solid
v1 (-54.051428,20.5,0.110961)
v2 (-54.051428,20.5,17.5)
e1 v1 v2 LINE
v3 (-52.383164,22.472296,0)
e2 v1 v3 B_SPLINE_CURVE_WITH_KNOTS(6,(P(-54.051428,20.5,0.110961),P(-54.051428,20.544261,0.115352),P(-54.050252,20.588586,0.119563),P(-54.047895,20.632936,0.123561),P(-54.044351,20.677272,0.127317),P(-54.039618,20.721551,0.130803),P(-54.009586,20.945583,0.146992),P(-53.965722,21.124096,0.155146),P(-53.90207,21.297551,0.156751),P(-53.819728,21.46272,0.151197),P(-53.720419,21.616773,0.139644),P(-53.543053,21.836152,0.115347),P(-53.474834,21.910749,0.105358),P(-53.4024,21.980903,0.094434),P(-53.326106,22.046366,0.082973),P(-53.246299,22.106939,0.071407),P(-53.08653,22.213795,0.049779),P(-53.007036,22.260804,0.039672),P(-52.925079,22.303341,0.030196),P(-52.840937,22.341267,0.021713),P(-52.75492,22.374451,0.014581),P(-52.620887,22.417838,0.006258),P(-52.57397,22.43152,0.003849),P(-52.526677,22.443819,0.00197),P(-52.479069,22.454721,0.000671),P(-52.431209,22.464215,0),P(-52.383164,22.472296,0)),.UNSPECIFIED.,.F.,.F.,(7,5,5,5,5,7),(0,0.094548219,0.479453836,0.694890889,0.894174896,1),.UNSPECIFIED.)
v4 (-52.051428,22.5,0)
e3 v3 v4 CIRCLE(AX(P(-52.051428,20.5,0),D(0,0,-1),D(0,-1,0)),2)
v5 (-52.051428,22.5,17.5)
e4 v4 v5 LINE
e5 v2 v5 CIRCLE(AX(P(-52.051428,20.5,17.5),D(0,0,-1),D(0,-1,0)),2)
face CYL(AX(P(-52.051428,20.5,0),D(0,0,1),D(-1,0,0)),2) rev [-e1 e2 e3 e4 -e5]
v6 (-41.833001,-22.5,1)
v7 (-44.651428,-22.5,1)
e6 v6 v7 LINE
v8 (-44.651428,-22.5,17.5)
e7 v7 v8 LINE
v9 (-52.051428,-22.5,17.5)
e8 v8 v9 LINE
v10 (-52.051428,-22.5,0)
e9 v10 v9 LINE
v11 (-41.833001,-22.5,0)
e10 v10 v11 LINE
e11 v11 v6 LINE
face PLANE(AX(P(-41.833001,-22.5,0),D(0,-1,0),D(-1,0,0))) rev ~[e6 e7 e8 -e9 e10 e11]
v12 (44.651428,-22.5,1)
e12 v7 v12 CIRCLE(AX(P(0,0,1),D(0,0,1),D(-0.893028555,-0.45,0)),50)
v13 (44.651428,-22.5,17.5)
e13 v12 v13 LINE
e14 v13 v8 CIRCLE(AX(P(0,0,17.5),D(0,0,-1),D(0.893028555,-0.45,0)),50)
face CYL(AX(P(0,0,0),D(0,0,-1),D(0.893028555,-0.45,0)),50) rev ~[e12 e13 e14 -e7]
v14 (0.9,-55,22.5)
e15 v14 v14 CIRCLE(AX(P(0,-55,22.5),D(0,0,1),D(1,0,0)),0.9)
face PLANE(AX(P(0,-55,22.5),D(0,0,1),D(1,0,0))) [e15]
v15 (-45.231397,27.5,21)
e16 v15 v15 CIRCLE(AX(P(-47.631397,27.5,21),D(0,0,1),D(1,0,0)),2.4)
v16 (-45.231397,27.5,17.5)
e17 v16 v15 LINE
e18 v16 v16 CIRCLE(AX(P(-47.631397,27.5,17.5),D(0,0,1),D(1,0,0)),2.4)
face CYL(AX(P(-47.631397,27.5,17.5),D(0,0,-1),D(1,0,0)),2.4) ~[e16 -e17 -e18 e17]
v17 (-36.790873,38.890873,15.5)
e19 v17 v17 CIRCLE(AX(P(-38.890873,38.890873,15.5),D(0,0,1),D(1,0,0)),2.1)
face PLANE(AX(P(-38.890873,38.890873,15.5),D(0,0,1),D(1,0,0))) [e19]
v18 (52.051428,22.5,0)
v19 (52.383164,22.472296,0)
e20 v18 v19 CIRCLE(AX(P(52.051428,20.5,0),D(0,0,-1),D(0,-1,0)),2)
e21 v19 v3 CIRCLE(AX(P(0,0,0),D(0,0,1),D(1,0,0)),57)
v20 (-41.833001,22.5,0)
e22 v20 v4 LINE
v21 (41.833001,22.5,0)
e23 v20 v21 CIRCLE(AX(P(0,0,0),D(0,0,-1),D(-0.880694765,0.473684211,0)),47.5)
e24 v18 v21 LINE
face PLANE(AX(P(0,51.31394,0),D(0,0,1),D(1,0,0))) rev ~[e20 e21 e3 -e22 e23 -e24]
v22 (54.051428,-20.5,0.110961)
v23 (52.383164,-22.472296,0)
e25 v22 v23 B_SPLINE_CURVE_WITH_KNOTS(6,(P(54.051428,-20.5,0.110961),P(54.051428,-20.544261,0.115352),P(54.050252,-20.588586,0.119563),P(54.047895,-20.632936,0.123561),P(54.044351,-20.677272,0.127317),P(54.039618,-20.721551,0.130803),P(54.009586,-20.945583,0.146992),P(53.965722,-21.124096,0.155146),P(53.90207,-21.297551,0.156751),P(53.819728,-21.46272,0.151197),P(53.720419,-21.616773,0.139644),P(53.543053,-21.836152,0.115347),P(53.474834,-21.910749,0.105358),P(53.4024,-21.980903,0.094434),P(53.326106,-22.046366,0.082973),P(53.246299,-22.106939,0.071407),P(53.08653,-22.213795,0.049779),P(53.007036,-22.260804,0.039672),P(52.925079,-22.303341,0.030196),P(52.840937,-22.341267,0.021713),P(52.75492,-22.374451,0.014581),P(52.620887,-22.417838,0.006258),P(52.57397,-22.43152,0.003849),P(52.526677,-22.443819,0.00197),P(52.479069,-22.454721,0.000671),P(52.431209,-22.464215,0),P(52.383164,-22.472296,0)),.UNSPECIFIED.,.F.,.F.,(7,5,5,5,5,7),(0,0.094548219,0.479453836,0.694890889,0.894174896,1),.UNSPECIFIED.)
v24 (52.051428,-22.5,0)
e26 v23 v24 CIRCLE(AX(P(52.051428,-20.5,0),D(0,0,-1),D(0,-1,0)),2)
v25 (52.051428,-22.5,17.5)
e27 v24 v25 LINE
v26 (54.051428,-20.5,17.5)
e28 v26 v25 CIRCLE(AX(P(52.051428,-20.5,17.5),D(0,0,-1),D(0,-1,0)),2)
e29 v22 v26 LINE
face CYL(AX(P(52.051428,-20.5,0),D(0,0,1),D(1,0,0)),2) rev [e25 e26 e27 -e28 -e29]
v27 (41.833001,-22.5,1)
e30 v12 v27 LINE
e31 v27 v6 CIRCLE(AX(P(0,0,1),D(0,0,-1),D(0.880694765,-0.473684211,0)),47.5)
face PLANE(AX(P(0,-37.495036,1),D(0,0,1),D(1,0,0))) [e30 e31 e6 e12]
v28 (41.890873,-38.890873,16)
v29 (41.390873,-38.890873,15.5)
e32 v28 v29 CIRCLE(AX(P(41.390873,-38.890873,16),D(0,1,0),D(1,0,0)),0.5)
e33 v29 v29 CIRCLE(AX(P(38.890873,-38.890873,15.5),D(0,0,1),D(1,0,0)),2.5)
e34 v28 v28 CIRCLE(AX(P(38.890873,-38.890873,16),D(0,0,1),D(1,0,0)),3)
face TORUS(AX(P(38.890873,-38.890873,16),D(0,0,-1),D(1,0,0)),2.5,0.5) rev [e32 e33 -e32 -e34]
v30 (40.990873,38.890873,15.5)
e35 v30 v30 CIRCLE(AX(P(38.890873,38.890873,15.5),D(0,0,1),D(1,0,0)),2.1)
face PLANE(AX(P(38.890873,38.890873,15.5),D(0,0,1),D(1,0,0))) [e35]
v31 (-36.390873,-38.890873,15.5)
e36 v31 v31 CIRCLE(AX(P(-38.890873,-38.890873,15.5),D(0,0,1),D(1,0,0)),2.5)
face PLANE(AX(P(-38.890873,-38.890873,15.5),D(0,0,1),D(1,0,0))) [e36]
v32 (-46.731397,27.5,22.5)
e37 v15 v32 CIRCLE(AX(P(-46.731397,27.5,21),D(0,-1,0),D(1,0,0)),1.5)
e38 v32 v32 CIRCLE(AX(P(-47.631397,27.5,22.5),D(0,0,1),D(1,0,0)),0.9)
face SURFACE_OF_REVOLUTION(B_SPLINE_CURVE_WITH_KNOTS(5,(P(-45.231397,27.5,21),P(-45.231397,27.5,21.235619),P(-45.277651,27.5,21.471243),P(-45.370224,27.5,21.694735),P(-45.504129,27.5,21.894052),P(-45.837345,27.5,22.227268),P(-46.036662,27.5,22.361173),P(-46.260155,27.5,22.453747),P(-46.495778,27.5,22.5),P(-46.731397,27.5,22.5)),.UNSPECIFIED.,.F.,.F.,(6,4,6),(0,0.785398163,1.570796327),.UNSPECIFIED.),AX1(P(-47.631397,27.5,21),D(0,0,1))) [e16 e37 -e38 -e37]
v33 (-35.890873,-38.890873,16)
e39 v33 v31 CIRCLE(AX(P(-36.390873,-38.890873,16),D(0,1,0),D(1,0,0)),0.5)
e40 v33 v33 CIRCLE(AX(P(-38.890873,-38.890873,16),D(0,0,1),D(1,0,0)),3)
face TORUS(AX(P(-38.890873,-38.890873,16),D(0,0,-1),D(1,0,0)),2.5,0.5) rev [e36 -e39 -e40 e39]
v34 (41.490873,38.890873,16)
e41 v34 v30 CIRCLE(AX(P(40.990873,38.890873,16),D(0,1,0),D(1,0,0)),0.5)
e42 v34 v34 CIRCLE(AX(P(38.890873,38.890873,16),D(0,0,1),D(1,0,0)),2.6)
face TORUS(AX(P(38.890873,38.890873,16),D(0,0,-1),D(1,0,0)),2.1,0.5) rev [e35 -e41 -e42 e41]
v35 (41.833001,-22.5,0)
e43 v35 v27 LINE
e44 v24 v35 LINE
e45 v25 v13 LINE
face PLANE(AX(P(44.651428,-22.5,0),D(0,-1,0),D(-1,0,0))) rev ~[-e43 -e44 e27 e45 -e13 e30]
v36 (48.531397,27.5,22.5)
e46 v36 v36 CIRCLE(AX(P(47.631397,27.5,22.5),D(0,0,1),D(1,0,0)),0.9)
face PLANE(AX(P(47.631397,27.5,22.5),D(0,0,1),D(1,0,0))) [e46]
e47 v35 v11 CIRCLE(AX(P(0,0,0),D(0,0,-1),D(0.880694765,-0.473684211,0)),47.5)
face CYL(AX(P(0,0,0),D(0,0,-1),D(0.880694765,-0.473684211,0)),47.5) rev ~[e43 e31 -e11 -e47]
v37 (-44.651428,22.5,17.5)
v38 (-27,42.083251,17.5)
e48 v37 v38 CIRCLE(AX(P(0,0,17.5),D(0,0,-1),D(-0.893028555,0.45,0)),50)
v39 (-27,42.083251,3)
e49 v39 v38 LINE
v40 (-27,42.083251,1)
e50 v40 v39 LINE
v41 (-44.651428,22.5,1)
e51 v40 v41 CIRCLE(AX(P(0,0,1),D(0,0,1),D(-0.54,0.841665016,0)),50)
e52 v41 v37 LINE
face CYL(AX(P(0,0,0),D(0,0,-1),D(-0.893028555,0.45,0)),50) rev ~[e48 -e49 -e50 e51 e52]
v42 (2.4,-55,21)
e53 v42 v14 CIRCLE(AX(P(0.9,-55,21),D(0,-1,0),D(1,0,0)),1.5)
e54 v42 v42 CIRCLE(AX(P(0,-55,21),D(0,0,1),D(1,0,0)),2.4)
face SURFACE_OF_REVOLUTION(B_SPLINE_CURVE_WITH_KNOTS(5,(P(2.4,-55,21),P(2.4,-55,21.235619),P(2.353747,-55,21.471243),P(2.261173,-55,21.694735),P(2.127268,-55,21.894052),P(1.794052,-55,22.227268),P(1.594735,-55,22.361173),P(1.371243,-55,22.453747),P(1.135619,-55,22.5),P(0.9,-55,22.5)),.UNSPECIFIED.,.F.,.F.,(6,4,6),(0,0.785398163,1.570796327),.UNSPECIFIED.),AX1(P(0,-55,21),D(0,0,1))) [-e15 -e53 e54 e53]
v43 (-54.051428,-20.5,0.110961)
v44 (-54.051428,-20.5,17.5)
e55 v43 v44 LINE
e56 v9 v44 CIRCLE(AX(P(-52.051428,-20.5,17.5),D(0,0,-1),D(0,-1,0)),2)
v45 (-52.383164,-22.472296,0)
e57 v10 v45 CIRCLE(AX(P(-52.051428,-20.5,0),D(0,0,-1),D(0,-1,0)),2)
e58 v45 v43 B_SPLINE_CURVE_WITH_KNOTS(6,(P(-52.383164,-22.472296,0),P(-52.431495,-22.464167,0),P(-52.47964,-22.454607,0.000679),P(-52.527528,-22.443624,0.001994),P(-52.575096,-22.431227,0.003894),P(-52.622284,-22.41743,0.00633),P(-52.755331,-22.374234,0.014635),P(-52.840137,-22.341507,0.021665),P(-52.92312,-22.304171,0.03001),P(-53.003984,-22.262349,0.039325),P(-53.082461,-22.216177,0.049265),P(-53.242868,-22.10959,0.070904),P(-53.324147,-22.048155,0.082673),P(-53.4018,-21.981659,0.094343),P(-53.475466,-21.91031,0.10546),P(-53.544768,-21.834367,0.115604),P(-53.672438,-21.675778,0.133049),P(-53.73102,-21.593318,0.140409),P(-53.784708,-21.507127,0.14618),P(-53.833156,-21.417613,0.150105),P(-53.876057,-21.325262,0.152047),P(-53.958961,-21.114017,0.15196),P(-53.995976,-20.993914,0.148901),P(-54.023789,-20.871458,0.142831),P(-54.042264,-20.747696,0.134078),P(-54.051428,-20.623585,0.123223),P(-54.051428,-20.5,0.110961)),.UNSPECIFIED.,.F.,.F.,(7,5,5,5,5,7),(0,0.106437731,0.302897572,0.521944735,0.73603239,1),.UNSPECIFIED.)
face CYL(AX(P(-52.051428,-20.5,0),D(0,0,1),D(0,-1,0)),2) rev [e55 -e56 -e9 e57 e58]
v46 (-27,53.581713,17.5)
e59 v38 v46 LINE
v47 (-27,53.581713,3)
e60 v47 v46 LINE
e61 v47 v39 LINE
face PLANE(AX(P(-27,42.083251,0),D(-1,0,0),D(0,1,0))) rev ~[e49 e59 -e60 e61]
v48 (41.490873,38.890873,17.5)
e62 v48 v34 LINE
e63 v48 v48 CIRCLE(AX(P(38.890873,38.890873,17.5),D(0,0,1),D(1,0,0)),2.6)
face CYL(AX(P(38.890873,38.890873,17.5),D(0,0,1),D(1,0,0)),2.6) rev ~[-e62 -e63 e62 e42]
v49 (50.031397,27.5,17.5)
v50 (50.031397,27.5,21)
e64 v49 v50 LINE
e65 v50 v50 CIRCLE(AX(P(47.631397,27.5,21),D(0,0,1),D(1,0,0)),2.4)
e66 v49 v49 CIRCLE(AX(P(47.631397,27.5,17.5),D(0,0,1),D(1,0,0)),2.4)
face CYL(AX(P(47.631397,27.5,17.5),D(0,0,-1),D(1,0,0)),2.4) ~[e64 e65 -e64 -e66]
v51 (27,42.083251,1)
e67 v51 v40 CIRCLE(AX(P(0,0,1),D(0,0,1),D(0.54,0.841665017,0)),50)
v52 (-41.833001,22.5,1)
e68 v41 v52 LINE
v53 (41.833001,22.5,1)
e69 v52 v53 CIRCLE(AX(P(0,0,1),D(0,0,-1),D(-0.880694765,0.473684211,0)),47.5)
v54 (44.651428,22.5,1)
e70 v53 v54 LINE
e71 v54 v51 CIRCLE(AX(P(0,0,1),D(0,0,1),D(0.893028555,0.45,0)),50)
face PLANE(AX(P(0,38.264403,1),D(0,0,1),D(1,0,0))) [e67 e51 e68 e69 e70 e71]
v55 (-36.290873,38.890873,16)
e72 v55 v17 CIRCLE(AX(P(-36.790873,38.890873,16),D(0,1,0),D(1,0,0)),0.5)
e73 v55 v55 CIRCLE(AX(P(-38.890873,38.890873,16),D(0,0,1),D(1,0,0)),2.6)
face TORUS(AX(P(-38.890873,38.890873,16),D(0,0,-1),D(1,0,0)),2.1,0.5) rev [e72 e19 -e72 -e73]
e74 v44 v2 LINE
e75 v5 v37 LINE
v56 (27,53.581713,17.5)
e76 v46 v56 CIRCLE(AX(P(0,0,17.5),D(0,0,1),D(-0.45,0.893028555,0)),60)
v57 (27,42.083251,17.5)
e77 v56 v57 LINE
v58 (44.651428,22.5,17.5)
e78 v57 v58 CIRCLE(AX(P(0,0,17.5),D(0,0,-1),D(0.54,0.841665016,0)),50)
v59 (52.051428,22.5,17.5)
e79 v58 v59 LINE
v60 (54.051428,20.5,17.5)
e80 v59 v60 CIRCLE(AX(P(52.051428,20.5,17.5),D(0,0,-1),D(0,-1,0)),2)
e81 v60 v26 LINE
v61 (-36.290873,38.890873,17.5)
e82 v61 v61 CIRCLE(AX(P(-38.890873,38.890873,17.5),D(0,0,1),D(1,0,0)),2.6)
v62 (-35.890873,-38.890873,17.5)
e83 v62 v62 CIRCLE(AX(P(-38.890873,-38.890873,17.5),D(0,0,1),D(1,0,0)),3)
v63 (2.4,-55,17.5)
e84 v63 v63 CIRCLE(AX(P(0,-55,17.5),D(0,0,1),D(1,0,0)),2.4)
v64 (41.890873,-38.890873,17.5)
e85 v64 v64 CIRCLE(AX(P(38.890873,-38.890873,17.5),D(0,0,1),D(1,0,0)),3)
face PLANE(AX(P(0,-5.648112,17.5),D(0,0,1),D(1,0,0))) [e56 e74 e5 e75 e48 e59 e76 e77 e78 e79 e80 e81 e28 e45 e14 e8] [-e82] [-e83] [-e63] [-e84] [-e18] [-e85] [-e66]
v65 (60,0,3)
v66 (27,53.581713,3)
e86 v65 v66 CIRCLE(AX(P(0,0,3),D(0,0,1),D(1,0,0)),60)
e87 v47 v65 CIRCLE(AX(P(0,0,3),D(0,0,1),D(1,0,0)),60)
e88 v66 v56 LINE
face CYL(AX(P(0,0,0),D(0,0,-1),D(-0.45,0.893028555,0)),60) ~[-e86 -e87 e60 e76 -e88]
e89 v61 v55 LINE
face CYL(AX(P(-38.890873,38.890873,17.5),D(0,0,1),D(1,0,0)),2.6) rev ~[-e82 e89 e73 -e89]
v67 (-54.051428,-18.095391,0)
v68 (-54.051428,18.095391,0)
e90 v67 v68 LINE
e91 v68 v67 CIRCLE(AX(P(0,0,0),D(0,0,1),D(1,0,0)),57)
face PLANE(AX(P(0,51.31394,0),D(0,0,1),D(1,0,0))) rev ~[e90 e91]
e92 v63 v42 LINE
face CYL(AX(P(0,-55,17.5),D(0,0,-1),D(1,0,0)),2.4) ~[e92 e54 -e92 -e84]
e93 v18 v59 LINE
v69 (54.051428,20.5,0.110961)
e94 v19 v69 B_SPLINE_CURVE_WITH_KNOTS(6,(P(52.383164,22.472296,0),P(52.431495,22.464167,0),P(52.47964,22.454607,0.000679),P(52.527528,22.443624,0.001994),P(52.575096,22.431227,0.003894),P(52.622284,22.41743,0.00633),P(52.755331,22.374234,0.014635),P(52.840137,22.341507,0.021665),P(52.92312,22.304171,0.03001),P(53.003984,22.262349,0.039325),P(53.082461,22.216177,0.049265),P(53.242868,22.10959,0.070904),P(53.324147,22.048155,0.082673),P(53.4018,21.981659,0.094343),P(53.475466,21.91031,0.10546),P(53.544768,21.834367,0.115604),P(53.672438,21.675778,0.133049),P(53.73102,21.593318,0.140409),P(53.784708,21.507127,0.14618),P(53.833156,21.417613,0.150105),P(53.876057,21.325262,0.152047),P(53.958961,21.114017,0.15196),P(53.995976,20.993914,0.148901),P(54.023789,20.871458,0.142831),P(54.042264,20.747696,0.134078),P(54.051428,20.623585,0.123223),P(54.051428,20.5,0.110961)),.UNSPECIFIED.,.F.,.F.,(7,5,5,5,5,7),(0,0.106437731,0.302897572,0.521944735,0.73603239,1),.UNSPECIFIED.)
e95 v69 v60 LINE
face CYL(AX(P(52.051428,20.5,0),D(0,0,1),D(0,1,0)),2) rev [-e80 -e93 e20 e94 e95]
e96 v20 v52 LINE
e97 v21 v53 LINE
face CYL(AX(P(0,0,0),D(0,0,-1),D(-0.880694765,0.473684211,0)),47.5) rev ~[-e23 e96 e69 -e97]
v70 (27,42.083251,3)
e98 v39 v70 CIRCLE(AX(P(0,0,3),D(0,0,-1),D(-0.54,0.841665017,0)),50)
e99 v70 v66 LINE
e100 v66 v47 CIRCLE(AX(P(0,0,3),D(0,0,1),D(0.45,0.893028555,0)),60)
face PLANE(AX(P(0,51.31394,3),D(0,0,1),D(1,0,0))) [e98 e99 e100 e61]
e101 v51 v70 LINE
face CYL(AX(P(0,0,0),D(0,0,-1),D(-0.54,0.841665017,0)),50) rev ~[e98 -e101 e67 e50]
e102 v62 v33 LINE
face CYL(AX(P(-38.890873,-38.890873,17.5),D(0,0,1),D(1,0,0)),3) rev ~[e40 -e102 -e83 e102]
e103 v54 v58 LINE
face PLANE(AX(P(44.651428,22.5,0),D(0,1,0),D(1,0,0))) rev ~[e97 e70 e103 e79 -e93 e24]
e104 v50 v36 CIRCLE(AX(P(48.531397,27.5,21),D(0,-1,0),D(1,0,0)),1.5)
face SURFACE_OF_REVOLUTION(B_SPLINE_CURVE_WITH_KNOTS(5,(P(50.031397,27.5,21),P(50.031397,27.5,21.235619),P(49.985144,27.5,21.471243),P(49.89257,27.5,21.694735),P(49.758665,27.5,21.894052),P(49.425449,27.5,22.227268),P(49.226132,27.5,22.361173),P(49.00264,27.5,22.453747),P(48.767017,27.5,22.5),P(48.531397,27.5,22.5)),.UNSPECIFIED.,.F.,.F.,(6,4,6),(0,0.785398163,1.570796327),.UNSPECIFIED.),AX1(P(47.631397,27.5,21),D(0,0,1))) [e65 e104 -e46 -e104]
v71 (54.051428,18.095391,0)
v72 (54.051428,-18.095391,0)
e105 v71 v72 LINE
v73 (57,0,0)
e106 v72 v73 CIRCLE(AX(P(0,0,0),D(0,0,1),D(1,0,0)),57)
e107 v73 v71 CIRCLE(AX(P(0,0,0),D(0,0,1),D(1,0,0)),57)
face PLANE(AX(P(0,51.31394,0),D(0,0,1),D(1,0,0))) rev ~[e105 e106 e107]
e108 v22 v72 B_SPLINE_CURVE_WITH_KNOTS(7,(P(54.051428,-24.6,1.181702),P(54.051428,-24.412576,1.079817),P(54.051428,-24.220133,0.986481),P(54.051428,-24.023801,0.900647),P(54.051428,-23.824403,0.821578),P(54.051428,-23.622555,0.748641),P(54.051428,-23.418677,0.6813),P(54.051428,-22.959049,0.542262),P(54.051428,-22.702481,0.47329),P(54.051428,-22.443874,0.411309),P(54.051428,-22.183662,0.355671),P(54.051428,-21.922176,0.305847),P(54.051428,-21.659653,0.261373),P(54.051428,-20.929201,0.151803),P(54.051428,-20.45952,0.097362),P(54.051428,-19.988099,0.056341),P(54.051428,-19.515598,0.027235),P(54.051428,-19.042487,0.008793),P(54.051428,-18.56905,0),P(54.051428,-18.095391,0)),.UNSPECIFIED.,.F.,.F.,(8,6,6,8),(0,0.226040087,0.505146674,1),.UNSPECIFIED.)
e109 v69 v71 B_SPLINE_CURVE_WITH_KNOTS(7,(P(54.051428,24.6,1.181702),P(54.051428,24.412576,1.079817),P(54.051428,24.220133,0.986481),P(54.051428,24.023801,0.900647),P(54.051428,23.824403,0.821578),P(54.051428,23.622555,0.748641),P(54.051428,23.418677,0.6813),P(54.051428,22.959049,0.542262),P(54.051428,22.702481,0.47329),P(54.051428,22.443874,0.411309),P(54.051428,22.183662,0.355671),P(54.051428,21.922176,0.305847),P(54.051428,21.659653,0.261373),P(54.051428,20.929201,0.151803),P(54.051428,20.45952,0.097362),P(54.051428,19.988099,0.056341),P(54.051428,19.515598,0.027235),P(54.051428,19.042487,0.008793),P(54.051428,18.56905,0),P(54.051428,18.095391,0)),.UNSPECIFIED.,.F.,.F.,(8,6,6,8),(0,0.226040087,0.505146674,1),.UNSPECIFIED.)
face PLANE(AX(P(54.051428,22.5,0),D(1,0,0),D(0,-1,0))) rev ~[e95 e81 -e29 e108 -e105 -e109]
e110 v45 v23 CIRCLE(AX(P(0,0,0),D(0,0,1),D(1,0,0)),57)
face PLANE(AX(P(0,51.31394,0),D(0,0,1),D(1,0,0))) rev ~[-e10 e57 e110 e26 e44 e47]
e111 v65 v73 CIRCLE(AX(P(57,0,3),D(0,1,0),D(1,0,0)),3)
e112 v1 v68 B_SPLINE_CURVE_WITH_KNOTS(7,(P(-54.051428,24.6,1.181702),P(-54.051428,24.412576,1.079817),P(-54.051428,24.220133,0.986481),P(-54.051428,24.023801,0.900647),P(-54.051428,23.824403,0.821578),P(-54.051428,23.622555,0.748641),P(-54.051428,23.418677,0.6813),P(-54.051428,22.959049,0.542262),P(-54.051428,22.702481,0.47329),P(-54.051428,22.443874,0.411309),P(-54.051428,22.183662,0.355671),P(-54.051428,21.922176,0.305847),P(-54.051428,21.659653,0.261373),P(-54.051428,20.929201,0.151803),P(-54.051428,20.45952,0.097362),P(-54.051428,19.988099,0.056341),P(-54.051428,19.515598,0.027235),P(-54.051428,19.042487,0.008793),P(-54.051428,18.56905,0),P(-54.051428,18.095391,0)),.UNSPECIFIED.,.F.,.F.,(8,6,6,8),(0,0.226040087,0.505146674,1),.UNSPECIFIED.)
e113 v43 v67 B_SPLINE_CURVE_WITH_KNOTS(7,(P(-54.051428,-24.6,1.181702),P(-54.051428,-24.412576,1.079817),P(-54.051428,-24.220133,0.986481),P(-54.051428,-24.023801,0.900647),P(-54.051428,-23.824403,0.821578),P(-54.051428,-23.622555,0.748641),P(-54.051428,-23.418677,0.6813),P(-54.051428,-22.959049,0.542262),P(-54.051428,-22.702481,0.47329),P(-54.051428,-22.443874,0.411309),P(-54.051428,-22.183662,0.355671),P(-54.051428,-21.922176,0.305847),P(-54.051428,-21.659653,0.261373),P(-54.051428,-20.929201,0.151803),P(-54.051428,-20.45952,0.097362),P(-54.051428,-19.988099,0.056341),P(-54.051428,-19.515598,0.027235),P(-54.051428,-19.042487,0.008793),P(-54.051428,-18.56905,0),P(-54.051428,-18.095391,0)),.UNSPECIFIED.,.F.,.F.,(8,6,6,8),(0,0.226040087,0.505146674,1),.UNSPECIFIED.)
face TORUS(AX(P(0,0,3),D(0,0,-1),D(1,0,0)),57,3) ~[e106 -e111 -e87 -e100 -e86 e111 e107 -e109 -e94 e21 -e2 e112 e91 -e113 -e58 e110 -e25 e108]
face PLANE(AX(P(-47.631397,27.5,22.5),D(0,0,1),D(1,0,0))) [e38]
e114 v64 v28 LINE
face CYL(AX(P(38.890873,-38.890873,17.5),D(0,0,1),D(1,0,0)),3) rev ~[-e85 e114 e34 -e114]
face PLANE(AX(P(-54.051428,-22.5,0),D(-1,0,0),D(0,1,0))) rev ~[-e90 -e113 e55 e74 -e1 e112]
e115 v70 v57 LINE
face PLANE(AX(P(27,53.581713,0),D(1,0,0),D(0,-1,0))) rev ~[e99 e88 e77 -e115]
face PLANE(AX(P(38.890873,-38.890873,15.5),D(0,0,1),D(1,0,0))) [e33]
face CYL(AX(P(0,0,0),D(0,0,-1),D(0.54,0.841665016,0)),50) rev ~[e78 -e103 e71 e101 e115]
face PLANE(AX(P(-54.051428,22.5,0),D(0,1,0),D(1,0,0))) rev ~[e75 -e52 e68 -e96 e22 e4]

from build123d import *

# Parameters (mm, degrees)
F1_DEPTH  = 17.5
F2_R      = 2.6
F2_R_2    = 3
F3_DEPTH  = 2
F2_R_3    = 2.4
F4_DEPTH  = 5
F5_R      = 0.5
F6_R      = 1.5
F10_DEPTH = 1
F11_DEPTH = 3
F12_R     = 2


# Not quite as in the source:
# - a fillet or chamfer that OpenCascade refuses, or shapes differently, is made with other operations: its cross-section is extruded or revolved along the edge and cut away or added


with BuildPart() as f1:
    # F0 (on Top) → F1 (new body)
    with BuildSketch(Plane.XY):
        with BuildLine():
            ThreePointArc((-27, 53.5817132985), (-31.4642654451, -51.0881590978), (60, 0))
            ThreePointArc((60, 0), (51.0881590978, 31.4642654451), (27, 53.5817132985))
            Line((27, 53.5817132985), (27, 42.083250825))
            ThreePointArc((27, 42.083250825), (37.1397052065, 33.4759958354), (44.6514277487, 22.5))
            Line((44.6514277487, 22.5), (54.0514277487, 22.5))
            Line((54.0514277487, 22.5), (54.0514277487, -22.5))
            Line((54.0514277487, -22.5), (44.6514277487, -22.5))
            ThreePointArc((44.6514277487, -22.5), (0, -50), (-44.6514277487, -22.5))
            Line((-44.6514277487, -22.5), (-54.0514277487, -22.5))
            Line((-54.0514277487, -22.5), (-54.0514277487, 22.5))
            Line((-54.0514277487, 22.5), (-44.6514277487, 22.5))
            ThreePointArc((-44.6514277487, 22.5), (-37.1397052065, 33.4759958354), (-27, 42.083250825))
            Line((-27, 42.083250825), (-27, 53.5817132985))
        make_face()
    extrude(amount=F1_DEPTH)

    # F2 (on face) → F3 (cut)
    with BuildSketch(Plane.XY.offset(17.5)):
        with Locations((-38.8908729653, 38.8908729653)):
            Circle(F2_R)
        with Locations((38.8908729653, 38.8908729653)):
            Circle(F2_R)
        with Locations((38.8908729653, -38.8908729653)):
            Circle(F2_R_2)
        with Locations((-38.8908729653, -38.8908729653)):
            Circle(F2_R_2)
    extrude(amount=-F3_DEPTH, mode=Mode.SUBTRACT)

    # F2 (on face) → F4 (join)
    with BuildSketch(Plane.XY.offset(17.5)):
        with Locations((0, -55)):
            Circle(F2_R_3)
        with Locations((47.6313972081, 27.5)):
            Circle(F2_R_3)
        with Locations((-47.6313972081, 27.5)):
            Circle(F2_R_3)
    extrude(amount=F4_DEPTH)

    # F5
    f5_edges = [f1.edges().sort_by_distance(p)[0] for p in [
        (35.890873, -38.890873, 15.5),
        (-41.890873, -38.890873, 15.5),
        (-41.490873, 38.890873, 15.5),
        (36.290873, 38.890873, 15.5),
    ]]
    fillet(f5_edges, radius=F5_R)

    # F6
    f6_edges = [f1.edges().sort_by_distance(p)[0] for p in [
        (-2.4, -55, 22.5),
        (-50.031397, 27.5, 22.5),
        (45.231397, 27.5, 22.5),
    ]]
    fillet(f6_edges, radius=F6_R)


with BuildPart() as f7_1:
    # F7: copy of F1
    add(f1.part)


with BuildPart() as f1_1:
    add(f1.part)

    # F0 (on Top) → F10 (join)
    with BuildSketch(Plane.XY):
        with BuildLine():
            ThreePointArc((-44.6514277487, -22.5), (0, -50), (44.6514277487, -22.5))
            Line((44.6514277487, -22.5), (41.8330013267, -22.5))
            ThreePointArc((41.8330013267, -22.5), (0, -47.5), (-41.8330013267, -22.5))
            Line((-41.8330013267, -22.5), (-44.6514277487, -22.5))
        make_face()
        with BuildLine():
            ThreePointArc((44.6514277487, 22.5), (37.1397052065, 33.4759958354), (27, 42.083250825))
            ThreePointArc((27, 42.083250825), (0, 50), (-27, 42.083250825))
            ThreePointArc((-27, 42.083250825), (-37.1397052065, 33.4759958354), (-44.6514277487, 22.5))
            Line((-44.6514277487, 22.5), (-41.8330013267, 22.5))
            ThreePointArc((-41.8330013267, 22.5), (0, 47.5), (41.8330013267, 22.5))
            Line((41.8330013267, 22.5), (44.6514277487, 22.5))
        make_face()
    extrude(amount=F10_DEPTH)

    # F0 (on Top) → F11 (join)
    with BuildSketch(Plane.XY):
        with BuildLine():
            Line((27, 42.083250825), (27, 53.5817132985))
            ThreePointArc((27, 53.5817132985), (0, 60), (-27, 53.5817132985))
            Line((-27, 53.5817132985), (-27, 42.083250825))
            ThreePointArc((-27, 42.083250825), (0, 50), (27, 42.083250825))
        make_face()
    extrude(amount=F11_DEPTH)

    # F12
    f12_edges = [f1_1.edges().sort_by_distance(p)[0] for p in [
        (-54.051428, 22.5, 8.75),
        (54.051428, 22.5, 8.75),
        (54.051428, -22.5, 8.75),
        (-54.051428, -22.5, 8.75),
    ]]
    fillet(f12_edges, radius=F12_R)

    # F13: fillet of radius 3 on 1 edges, made by hand

    # F13_s1 → F13_t2 (revolve, cut)
    with BuildSketch(Plane.XZ):
        with BuildLine():
            ThreePointArc((60, 3), (59.1213203436, 0.8786796564), (57, 0))
            Line((57, 0), (60, 0))
            Line((60, 0), (60, 3))
        make_face()
    revolve(axis=Axis((0, 0, 0), (0, 0, 1)), mode=Mode.SUBTRACT)


solid = f1_1.part
